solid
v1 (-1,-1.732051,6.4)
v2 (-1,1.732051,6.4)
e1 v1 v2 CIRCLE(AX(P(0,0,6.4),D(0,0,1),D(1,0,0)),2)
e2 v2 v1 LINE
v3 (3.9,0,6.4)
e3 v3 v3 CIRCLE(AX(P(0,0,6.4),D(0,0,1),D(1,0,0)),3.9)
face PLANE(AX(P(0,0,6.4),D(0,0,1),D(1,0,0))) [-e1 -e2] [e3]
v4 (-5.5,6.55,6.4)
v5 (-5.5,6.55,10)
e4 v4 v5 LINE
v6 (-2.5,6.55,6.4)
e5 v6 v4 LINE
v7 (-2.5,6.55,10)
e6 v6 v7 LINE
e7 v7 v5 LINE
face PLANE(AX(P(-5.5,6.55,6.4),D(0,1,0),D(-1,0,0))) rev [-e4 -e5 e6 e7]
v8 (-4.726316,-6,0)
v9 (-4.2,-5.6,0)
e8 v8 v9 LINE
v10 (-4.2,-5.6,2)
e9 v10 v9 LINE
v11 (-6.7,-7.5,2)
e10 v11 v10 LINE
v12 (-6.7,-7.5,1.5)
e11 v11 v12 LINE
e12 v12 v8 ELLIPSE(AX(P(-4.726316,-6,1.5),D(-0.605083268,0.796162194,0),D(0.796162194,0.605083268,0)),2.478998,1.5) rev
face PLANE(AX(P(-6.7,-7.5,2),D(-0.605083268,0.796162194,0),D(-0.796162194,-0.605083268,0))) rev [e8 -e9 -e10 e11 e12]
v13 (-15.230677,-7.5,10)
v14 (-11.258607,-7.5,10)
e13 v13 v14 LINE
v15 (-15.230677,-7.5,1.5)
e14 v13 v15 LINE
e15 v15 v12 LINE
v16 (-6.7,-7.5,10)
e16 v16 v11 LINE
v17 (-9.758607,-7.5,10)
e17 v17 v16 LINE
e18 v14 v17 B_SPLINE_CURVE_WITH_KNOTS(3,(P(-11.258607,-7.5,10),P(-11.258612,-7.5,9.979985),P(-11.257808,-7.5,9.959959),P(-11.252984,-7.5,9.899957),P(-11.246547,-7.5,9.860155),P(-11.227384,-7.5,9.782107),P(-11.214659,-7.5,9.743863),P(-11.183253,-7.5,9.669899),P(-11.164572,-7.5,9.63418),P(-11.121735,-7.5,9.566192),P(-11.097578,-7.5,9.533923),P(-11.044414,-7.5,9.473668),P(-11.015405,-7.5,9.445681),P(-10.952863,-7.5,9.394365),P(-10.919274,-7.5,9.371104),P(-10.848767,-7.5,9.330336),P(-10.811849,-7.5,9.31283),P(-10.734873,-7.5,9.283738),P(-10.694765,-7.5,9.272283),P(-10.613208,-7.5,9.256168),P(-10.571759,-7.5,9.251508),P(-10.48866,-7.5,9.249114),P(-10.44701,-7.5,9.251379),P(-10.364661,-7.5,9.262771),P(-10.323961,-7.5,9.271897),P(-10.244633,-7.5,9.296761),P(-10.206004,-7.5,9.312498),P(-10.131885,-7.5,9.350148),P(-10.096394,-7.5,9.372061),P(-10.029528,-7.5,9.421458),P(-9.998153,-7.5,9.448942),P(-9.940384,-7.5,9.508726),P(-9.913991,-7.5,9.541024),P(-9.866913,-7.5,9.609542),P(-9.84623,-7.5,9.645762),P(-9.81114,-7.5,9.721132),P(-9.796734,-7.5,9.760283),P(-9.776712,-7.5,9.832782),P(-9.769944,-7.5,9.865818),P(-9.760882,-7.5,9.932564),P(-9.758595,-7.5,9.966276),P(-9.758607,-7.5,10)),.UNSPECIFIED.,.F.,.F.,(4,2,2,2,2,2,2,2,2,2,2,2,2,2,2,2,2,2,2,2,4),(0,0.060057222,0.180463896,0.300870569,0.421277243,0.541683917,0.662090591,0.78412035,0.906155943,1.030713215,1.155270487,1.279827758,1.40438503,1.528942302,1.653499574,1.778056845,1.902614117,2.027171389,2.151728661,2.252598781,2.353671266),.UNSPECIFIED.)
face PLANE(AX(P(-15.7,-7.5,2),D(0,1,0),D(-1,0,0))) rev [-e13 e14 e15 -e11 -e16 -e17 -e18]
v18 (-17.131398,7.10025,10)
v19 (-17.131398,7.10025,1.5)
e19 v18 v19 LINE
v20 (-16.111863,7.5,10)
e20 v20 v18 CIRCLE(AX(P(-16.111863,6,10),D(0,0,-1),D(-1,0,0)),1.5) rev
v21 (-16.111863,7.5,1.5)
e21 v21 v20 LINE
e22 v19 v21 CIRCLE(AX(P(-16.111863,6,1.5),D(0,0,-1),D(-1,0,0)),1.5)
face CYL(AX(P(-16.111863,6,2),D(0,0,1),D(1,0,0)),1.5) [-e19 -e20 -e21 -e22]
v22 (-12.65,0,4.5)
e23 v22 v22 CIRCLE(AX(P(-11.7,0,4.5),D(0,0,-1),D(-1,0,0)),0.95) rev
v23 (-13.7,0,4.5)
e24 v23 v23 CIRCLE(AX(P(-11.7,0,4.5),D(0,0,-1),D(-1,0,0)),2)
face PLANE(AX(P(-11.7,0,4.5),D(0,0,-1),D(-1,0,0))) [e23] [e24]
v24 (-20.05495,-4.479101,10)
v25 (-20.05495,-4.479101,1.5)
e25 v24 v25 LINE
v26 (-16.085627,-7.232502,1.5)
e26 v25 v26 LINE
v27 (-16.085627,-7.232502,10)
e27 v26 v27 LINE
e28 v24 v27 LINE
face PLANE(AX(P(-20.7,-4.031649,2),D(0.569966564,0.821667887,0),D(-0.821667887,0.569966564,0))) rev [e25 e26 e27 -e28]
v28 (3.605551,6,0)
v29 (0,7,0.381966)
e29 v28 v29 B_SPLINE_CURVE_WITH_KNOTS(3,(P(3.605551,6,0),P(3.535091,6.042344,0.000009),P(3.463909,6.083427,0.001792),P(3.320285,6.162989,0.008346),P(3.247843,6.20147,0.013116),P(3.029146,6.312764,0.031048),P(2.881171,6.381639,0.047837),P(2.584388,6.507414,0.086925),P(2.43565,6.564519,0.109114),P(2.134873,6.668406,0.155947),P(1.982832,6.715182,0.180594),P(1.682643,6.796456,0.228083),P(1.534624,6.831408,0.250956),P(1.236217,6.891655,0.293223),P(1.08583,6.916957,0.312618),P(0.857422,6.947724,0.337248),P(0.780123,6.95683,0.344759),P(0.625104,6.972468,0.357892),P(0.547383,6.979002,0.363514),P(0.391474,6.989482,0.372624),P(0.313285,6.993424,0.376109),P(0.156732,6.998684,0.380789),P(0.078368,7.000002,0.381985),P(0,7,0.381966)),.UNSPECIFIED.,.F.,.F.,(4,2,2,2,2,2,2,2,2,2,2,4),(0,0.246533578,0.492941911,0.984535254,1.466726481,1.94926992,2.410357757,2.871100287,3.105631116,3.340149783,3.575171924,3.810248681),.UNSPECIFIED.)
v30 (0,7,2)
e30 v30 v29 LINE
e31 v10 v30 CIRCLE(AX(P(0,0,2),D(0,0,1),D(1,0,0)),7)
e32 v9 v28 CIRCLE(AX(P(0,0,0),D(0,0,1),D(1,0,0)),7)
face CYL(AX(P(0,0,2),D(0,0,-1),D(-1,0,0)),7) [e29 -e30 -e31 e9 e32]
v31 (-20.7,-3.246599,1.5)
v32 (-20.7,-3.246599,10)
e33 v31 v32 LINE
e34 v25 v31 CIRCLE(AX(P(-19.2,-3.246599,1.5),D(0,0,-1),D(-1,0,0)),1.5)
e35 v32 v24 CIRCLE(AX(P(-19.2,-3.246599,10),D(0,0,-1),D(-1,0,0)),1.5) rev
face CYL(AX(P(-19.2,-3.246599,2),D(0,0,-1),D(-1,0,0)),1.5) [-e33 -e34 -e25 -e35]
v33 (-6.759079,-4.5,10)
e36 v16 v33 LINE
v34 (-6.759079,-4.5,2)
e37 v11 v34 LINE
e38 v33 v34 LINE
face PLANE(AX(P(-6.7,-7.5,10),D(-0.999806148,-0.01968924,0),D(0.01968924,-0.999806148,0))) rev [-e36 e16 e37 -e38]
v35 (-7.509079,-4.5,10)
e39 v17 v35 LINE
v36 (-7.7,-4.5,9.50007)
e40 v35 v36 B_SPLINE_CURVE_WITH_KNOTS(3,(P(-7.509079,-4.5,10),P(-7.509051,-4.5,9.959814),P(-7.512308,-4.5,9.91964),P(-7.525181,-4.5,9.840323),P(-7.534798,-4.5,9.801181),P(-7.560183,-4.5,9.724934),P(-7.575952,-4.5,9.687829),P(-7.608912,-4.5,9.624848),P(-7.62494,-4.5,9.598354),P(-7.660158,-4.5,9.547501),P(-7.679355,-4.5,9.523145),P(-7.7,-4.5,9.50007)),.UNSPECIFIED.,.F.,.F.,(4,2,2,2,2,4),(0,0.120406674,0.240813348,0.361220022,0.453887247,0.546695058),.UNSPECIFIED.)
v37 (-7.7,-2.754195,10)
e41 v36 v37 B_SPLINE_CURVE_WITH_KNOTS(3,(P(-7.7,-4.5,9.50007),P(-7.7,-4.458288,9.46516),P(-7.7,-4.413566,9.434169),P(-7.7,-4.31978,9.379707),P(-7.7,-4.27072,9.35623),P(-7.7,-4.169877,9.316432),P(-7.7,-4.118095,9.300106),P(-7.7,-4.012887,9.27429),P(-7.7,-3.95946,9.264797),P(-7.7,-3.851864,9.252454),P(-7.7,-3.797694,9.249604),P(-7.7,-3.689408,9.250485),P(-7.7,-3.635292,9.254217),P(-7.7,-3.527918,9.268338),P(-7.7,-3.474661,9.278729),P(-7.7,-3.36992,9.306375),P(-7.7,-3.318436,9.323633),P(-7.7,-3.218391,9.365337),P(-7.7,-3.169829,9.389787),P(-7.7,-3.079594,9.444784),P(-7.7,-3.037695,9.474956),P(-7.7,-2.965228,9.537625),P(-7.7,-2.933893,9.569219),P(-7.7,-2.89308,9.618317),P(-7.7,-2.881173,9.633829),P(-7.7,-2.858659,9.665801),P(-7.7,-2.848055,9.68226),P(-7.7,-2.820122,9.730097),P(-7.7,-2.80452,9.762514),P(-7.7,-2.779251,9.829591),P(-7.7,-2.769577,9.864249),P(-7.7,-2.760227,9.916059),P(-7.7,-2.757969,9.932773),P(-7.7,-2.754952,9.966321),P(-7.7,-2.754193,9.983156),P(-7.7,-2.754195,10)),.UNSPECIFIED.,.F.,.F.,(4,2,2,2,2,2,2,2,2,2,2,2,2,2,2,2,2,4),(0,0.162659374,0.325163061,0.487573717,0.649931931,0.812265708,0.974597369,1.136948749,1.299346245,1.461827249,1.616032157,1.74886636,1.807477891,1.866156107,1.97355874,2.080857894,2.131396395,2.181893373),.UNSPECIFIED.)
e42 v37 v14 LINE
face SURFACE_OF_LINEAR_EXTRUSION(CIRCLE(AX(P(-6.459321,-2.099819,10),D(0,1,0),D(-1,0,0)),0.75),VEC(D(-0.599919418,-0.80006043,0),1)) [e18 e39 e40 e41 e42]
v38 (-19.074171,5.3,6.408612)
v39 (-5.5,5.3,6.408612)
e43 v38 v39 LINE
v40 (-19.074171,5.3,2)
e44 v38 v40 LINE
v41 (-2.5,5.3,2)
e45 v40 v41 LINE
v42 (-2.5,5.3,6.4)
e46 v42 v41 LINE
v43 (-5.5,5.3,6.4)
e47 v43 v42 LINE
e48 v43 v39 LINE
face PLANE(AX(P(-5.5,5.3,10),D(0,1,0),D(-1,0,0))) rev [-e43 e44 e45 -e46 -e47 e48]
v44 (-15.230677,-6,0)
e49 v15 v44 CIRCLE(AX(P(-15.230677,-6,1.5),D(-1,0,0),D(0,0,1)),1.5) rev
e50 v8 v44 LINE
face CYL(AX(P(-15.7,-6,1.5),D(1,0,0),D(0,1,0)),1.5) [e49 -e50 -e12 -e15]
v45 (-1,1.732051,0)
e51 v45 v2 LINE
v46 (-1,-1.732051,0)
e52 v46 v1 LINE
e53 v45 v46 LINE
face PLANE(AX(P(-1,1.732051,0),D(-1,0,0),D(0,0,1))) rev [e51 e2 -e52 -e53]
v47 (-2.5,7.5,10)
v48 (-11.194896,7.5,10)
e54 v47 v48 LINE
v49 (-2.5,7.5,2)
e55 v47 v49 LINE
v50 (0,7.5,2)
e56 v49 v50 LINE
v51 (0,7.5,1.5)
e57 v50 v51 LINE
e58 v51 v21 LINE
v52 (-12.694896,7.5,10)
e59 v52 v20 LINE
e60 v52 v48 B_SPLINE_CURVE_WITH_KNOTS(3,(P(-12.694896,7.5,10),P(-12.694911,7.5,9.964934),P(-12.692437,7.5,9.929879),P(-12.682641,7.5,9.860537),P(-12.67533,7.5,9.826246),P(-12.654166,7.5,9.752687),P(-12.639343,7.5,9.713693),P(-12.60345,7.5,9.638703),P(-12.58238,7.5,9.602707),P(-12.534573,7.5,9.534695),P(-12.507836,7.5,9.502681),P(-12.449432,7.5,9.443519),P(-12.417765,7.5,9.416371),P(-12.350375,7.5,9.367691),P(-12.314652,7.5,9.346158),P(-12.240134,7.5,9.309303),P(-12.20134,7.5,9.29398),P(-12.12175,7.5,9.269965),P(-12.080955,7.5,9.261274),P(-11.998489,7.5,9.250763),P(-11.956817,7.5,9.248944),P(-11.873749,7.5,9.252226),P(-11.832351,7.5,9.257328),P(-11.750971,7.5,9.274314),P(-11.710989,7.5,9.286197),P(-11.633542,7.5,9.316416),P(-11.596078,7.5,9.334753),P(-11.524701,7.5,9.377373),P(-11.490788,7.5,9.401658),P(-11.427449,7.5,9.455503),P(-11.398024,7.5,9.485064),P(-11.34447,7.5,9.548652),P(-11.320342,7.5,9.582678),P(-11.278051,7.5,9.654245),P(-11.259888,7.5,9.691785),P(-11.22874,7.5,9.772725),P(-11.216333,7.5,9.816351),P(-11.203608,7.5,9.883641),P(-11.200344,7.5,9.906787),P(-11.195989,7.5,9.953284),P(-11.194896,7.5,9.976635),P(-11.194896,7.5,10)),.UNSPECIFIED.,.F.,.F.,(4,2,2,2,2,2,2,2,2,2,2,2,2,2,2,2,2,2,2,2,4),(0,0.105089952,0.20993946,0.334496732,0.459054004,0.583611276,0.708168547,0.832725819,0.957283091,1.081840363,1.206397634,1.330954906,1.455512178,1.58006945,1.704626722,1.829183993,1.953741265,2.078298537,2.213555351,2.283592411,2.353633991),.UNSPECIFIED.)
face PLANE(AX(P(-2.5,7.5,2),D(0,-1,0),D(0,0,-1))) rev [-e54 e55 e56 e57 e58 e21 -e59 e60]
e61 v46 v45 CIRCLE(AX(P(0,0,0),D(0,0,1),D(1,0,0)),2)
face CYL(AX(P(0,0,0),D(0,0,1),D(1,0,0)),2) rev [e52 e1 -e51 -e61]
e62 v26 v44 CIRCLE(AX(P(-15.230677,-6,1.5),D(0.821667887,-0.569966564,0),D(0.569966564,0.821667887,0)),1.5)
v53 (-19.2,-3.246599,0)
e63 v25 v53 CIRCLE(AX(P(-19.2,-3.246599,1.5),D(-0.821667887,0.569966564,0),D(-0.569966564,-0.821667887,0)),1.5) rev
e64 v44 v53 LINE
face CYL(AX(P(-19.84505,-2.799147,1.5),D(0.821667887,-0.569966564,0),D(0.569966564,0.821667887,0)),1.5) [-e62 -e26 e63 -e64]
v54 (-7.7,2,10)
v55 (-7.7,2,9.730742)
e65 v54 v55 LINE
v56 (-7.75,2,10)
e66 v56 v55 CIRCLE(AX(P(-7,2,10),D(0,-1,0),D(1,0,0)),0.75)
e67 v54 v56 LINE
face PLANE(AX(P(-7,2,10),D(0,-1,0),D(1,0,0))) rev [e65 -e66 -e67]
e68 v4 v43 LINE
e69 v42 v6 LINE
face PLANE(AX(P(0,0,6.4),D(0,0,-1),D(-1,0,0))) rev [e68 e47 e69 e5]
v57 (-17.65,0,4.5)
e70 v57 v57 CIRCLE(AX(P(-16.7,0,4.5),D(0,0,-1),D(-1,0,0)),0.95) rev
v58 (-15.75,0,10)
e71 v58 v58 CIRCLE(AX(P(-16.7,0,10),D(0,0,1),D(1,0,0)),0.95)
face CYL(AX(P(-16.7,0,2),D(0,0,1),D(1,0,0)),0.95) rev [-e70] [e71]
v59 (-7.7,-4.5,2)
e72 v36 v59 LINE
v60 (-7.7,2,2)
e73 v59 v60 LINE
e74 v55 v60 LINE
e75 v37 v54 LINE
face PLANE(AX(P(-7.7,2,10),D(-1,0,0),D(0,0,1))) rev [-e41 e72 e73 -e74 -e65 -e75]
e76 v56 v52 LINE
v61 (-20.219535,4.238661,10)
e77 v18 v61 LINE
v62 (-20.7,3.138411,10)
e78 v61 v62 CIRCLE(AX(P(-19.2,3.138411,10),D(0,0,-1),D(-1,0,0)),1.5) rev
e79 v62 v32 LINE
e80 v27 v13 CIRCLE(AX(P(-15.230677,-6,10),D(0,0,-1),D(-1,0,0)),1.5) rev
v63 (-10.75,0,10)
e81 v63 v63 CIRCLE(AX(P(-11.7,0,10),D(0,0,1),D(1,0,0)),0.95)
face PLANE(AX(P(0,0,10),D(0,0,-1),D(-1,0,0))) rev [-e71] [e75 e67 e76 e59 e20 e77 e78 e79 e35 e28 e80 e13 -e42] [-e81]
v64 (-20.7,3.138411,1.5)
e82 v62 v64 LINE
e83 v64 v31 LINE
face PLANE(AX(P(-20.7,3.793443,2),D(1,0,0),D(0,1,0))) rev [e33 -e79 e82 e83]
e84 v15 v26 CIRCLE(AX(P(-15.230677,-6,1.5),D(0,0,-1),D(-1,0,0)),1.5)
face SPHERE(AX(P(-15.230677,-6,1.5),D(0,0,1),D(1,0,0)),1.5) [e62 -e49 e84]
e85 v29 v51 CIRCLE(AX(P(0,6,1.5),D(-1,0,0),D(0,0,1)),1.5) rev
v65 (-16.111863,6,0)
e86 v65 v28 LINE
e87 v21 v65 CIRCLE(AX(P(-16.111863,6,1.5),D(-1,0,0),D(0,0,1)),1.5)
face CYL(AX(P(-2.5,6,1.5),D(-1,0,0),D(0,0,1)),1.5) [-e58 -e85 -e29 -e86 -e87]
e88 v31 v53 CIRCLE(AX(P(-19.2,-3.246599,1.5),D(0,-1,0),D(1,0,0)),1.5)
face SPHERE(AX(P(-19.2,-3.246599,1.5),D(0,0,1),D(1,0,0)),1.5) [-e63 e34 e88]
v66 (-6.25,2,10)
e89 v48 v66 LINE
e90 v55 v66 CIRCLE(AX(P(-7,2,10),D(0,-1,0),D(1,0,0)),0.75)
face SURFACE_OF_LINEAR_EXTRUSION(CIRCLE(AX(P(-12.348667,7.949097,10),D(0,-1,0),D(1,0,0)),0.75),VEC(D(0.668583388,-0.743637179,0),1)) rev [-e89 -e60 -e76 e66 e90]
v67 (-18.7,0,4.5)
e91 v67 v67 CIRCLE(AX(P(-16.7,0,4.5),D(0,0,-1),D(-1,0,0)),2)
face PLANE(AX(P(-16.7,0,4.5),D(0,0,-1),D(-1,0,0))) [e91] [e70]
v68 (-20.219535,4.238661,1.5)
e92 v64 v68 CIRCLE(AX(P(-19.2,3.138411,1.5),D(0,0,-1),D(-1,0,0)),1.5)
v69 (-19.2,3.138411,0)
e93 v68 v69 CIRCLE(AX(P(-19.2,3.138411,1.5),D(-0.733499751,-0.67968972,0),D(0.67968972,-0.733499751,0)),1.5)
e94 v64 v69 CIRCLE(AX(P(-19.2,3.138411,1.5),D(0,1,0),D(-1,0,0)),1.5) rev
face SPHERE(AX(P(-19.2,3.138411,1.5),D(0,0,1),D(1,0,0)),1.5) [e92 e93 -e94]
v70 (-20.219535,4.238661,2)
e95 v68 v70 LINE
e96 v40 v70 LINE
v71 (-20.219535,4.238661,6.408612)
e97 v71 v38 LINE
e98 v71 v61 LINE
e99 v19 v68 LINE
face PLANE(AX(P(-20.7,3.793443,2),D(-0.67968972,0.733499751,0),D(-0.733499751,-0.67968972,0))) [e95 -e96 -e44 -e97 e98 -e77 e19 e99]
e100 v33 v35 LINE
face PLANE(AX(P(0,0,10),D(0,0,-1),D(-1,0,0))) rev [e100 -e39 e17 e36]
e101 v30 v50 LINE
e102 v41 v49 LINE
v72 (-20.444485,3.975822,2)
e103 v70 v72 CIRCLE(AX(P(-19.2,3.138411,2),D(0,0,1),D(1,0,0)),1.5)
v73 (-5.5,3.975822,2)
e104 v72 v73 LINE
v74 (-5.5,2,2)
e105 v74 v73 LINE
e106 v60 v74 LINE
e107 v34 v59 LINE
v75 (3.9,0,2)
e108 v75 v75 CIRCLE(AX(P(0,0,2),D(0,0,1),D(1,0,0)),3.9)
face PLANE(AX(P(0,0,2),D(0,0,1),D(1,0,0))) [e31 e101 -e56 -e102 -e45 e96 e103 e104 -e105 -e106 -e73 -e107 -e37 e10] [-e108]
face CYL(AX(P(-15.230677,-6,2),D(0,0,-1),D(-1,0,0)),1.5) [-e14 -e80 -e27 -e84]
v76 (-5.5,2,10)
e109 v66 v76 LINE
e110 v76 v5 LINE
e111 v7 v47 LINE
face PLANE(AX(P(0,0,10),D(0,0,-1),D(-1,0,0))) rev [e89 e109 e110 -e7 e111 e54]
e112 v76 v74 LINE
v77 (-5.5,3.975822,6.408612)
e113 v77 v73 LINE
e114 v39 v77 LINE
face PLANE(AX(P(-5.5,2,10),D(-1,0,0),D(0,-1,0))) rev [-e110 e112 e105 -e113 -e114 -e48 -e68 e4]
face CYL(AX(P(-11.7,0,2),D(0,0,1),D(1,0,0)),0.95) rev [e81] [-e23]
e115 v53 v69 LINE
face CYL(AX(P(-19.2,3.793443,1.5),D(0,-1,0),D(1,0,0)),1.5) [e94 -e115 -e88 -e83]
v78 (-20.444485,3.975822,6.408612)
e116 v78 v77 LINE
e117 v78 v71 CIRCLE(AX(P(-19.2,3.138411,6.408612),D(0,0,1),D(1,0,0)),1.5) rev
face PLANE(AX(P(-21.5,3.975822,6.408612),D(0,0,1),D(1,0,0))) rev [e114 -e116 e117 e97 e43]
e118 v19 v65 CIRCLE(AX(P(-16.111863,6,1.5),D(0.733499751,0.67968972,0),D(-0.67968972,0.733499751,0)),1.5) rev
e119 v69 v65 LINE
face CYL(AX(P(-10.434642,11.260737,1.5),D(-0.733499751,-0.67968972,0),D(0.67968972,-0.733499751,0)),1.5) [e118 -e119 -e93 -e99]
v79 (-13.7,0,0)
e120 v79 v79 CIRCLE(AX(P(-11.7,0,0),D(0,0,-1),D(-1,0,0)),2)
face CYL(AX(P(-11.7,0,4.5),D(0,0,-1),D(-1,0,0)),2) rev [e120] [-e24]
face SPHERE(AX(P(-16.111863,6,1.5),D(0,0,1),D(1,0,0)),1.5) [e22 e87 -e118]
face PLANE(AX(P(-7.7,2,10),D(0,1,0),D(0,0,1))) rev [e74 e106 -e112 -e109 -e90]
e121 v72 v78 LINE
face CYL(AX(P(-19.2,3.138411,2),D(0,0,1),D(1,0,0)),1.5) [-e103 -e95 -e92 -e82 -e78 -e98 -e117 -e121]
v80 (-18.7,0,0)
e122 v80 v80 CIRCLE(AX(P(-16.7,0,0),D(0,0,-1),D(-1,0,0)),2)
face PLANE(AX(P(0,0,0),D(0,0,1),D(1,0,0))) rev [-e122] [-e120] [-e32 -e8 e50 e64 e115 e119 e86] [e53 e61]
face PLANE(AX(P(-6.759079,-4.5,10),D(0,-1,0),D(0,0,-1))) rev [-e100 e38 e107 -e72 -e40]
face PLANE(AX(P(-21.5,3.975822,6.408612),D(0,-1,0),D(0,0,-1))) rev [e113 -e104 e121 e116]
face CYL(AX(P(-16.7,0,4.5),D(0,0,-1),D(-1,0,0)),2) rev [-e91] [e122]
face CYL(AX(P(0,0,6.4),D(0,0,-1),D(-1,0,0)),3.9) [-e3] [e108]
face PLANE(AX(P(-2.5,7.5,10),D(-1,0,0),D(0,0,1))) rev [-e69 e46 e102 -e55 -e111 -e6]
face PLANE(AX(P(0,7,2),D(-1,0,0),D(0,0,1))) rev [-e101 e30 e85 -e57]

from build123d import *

# Parameters (mm, degrees)
BOSS_EXTRUDE1_DEPTH      = 2
BOSS_EXTRUDE2_DEPTH      = 8
SKETCH24_R               = 3.9
BOSS_EXTRUDE5_DEPTH      = 4.4
SKETCH30_W               = 4.40861202
SKETCH30_H               = 1.324178481
CUT_EXTRUDE12_DEPTH      = 16
CUT_EXTRUDE11_DEPTH      = 23.928148639
FILLET1_R                = 1.5
SKETCH34_R               = 0.75
CUT_EXTRUDE13_DEPTH      = 8
SKETCH35_R               = 0.75
CUT_EXTRUDE14_DEPTH      = 3
CUT_EXTRUDE14_DEPTH_BACK = 8
SKETCH36_R               = 0.95
CUT_EXTRUDE15_DEPTH      = 8
SKETCH37_R               = 2
CUT_EXTRUDE16_DEPTH      = 4.5
SKETCH38_W               = 3
SKETCH38_H               = 1.25
CUT_EXTRUDE17_DEPTH      = 3.6


with BuildPart() as part:
    # Sketch2 → Boss-Extrude1 (new body)
    with BuildSketch(Plane.XY):
        with BuildLine():
            Line((-2.5, 7.5), (-16.7, 7.5))
            Line((-16.7, 7.5), (-20.7, 3.793442666))
            Line((-20.7, 3.793442666), (-20.7, -4.031648778))
            Line((-20.7, -4.031648778), (-15.7, -7.5))
            Line((-15.7, -7.5), (-6.7, -7.5))
            Line((-6.7, -7.5), (-4.2, -5.6))
            ThreePointArc((-4.2, -5.6), (3.130495168, -6.260990337), (7, 0))
            ThreePointArc((7, 0), (4.949747468, 4.949747468), (0, 7))
            Line((0, 7), (0, 7.5))
            Line((0, 7.5), (-2.5, 7.5))
        make_face()
    extrude(amount=BOSS_EXTRUDE1_DEPTH)

    # Sketch4 → Boss-Extrude2 (add)
    with BuildSketch(Plane.XY.offset(2)):
        Polygon((-15.7, -7.5), (-6.7, -7.5), (-6.759079174, -4.5), (-7.7, -4.5), (-7.7, 2), (-5.5, 2), (-5.5, 5.3), (-2.5, 5.3), (-2.5, 7.5), (-16.7, 7.5), (-20.7, 3.793442666), (-20.7, -4.031648778), align=None)
    extrude(amount=BOSS_EXTRUDE2_DEPTH)

    # Sketch24 → Boss-Extrude5 (add)
    with BuildSketch(Plane.XY.offset(2)):
        Circle(SKETCH24_R)
    extrude(amount=BOSS_EXTRUDE5_DEPTH)

    # Sketch30 → Cut-Extrude12 (cut)
    with BuildSketch(Plane(origin=(-5.5, 0, 0), x_dir=(0, 0, -1), z_dir=(1, 0, 0))):
        with Locations((-4.20430601, 4.63791076)):
            Rectangle(SKETCH30_W, SKETCH30_H)
    extrude(amount=-CUT_EXTRUDE12_DEPTH, mode=Mode.SUBTRACT)

    # Sketch28 → Cut-Extrude11 (cut, through all)
    with BuildSketch(Plane.XY.offset(6.4)):
        with BuildLine():
            Line((-1, 1.732050808), (-1, -1.732050808))
            ThreePointArc((-1, -1.732050808), (2, 0), (-1, 1.732050808))
        make_face()
    extrude(amount=-CUT_EXTRUDE11_DEPTH, mode=Mode.SUBTRACT)

    # Fillet1
    # the kernel refuses this fillet: 1.5 mm, written as the material it takes off along each edge
    with BuildSketch(Plane(origin=(-15.230677435, -6, 1.5), x_dir=(-0.5699665637840448, -0.8216678867816415, 0), z_dir=(0, 0, -1))) as fillet1_piece_1_section:
        Polygon((0, 0), (FILLET1_R * 1.02, 0), (FILLET1_R * 1.02, -FILLET1_R * 0.319139344377), (FILLET1_R * 0.838101244517, -FILLET1_R * 0.58136589506), align=None)
    fillet1_piece_1 = extrude(amount=FILLET1_R * 1.02, mode=Mode.PRIVATE)
    fillet1_piece_1 = fillet1_piece_1 - Plane(origin=(-15.230677435, -6, 1.5), x_dir=(0.29860685961507855, 0.9543762064253388, 0), z_dir=(0, 0, -1)) * Sphere(FILLET1_R, mode=Mode.PRIVATE)
    add(fillet1_piece_1, mode=Mode.SUBTRACT)
    with BuildSketch(Plane(origin=(-16.11186344, 6, 1.5), x_dir=(-0.6796897201843015, 0.7334997506991983, 0), z_dir=(0, 0, -1))) as fillet1_piece_2_section:
        Polygon((0, 0), (FILLET1_R * 1.02, 0), (FILLET1_R * 1.02, FILLET1_R * 0.399932860855), (FILLET1_R * 0.748169745713, FILLET1_R * 0.693283514588), align=None)
    fillet1_piece_2 = extrude(amount=FILLET1_R * 1.02, mode=Mode.PRIVATE)
    fillet1_piece_2 = fillet1_piece_2 - Plane(origin=(-16.11186344, 6, 1.5), x_dir=(0.3650344157067945, -0.9309940254102596, 0), z_dir=(0, 0, -1)) * Sphere(FILLET1_R, mode=Mode.PRIVATE)
    add(fillet1_piece_2, mode=Mode.SUBTRACT)
    with BuildSketch(Plane(origin=(-19.2, 3.138411196, 1.5), x_dir=(-0.6796897201843015, 0.7334997506991983, 0), z_dir=(0, 0, -1))) as fillet1_piece_3_section:
        Polygon((0, 0), (FILLET1_R * 1.02, 0), (FILLET1_R * 1.02, -FILLET1_R * 0.445421399395), (FILLET1_R * 0.693283514588, -FILLET1_R * 0.748169745713), align=None)
    fillet1_piece_3 = extrude(amount=FILLET1_R * 1.02, mode=Mode.PRIVATE)
    fillet1_piece_3 = fillet1_piece_3 - Plane(origin=(-19.2, 3.138411196, 1.5), x_dir=(0.9164304993244992, -0.40019387789901173, 0), z_dir=(0, 0, -1)) * Sphere(FILLET1_R, mode=Mode.PRIVATE)
    add(fillet1_piece_3, mode=Mode.SUBTRACT)
    with BuildSketch(Plane(origin=(-19.2, -3.246599046, 1.5), x_dir=(-0.5699665637840448, -0.8216678867816415, 0), z_dir=(0, 0, -1))) as fillet1_piece_4_section:
        Polygon((0, 0), (FILLET1_R * 1.02, 0), (FILLET1_R * 1.02, FILLET1_R * 0.533833817771), (FILLET1_R * 0.58136589506, FILLET1_R * 0.838101244517), align=None)
    fillet1_piece_4 = extrude(amount=FILLET1_R * 1.02, mode=Mode.PRIVATE)
    fillet1_piece_4 = fillet1_piece_4 - Plane(origin=(-19.2, -3.246599046, 1.5), x_dir=(0.8859928227090906, 0.46369895202380795, 0), z_dir=(0, 0, -1)) * Sphere(FILLET1_R, mode=Mode.PRIVATE)
    add(fillet1_piece_4, mode=Mode.SUBTRACT)
    with BuildSketch(Plane(origin=(-15.230677435, -7.5, 0), x_dir=(0, 1, 0), z_dir=(1, 0, 0))) as fillet1_piece_5_section:
        with BuildLine():
            CenterArc((FILLET1_R, FILLET1_R), FILLET1_R, 180, 90)
            Line((0, FILLET1_R), (0, 0))
            Line((0, 0), (FILLET1_R, 0))
        make_face()
    fillet1_piece_5 = extrude(amount=12.280677435, mode=Mode.PRIVATE)
    fillet1_piece_5 = split(fillet1_piece_5, bisect_by=Plane(origin=(-9.092127217, -9.318016685, 0.3282266), z_dir=(-0.6050832675335577, 0.7961621941231027, 0)), keep=Keep.TOP, mode=Mode.PRIVATE)
    add(fillet1_piece_5, mode=Mode.SUBTRACT)
    with BuildSketch(Plane(origin=(3.75, 7.5, 0), x_dir=(0, 0, 1), z_dir=(-1, 0, 0))) as fillet1_piece_6:
        with BuildLine():
            CenterArc((FILLET1_R, -FILLET1_R), FILLET1_R, 90, 90)
            Line((0, -FILLET1_R), (0, 0))
            Line((0, 0), (FILLET1_R, 0))
        make_face()
    extrude(amount=19.86186344, mode=Mode.SUBTRACT)
    with BuildSketch(Plane(origin=(-17.13139802, 7.100249626, 0), x_dir=(0.6796897201843014, -0.7334997506991981, 0), z_dir=(-0.7334997506991983, -0.6796897201843015, 0))) as fillet1_piece_7:
        with BuildLine():
            CenterArc((FILLET1_R, FILLET1_R), FILLET1_R, 180, 90)
            Line((0, FILLET1_R), (0, 0))
            Line((0, 0), (FILLET1_R, 0))
        make_face()
    extrude(amount=4.21013989, mode=Mode.SUBTRACT)
    with BuildSketch(Plane(origin=(-20.054949846, -4.479100876, 0), x_dir=(0.5699665637840448, 0.8216678867816416, 0), z_dir=(0.8216678867816415, -0.5699665637840448, 0))) as fillet1_piece_8:
        with BuildLine():
            CenterArc((FILLET1_R, FILLET1_R), FILLET1_R, 180, 90)
            Line((0, FILLET1_R), (0, 0))
            Line((0, 0), (FILLET1_R, 0))
        make_face()
    extrude(amount=4.830811364, mode=Mode.SUBTRACT)
    with BuildSketch(Plane(origin=(-20.7, 3.138411196, 0), x_dir=(1, 0, 0), z_dir=(0, -1, 0))) as fillet1_piece_9:
        with BuildLine():
            CenterArc((FILLET1_R, FILLET1_R), FILLET1_R, 180, 90)
            Line((0, FILLET1_R), (0, 0))
            Line((0, 0), (FILLET1_R, 0))
        make_face()
    extrude(amount=6.385010242, mode=Mode.SUBTRACT)
    with BuildSketch(Plane(origin=(-15.7, -7.5, 1.5), x_dir=(1, 0, 0), z_dir=(0, 0, 1))) as fillet1_piece_10:
        with BuildLine():
            CenterArc((FILLET1_R * 0.312881710173, FILLET1_R), FILLET1_R, 235.252105822, 34.747894178)
            Line((-FILLET1_R * 0.257084853611, FILLET1_R * 0.178332113218), (0, 0))
            Line((0, 0), (FILLET1_R * 0.312881710173, 0))
        make_face()
    extrude(amount=9.673306413, mode=Mode.SUBTRACT)
    with BuildSketch(Plane(origin=(-20.7, -4.031648778, 1.5), x_dir=(0, 1, 0), z_dir=(0, 0, 1))) as fillet1_piece_11:
        with BuildLine():
            CenterArc((FILLET1_R * 0.523366488011, -FILLET1_R), FILLET1_R, 90, 55.252105822)
            Line((-FILLET1_R * 0.298301398771, -FILLET1_R * 0.430033436216), (0, 0))
            Line((0, 0), (FILLET1_R * 0.523366488011, 0))
        make_face()
    extrude(amount=10.46262433, mode=Mode.SUBTRACT)
    with BuildSketch(Plane(origin=(-20.7, 3.793442666, 1.5), x_dir=(0.7334997506991984, 0.6796897201843014, 0), z_dir=(0, 0, 1))) as fillet1_piece_12:
        with BuildLine():
            CenterArc((FILLET1_R * 0.436687646465, -FILLET1_R), FILLET1_R, 90, 47.18059856)
            Line((-FILLET1_R * 0.296812104234, -FILLET1_R * 0.320310279816), (0, 0))
            Line((0, 0), (FILLET1_R * 0.436687646465, 0))
        make_face()
    extrude(amount=10.137578674, mode=Mode.SUBTRACT)
    with BuildSketch(Plane(origin=(-16.7, 7.5, 1.5), x_dir=(1, 0, 0), z_dir=(0, 0, 1))) as fillet1_piece_13:
        with BuildLine():
            CenterArc((FILLET1_R * 0.392091040054, -FILLET1_R), FILLET1_R, 90, 42.81940144)
            Line((-FILLET1_R * 0.287598680131, -FILLET1_R * 0.266500249301), (0, 0))
            Line((0, 0), (FILLET1_R * 0.392091040054, 0))
        make_face()
    extrude(amount=9.9703414, mode=Mode.SUBTRACT)

    # Sketch34 → Cut-Extrude13 (cut, along a direction that is not the sketch's normal)
    with BuildSketch(Plane.XZ.offset(-2)):
        with Locations((-7, 10)):
            Circle(SKETCH34_R)
    extrude(amount=-CUT_EXTRUDE13_DEPTH, dir=(0.6685833876565112, -0.7436371788377336, 0), mode=Mode.SUBTRACT)

    # Sketch35 → Cut-Extrude14 (cut, two sides, along a direction that is not the sketch's normal)
    with BuildSketch(Plane(origin=(0, -4.5, 0), x_dir=(1, 0, 0), z_dir=(0, 1, 0))) as cut_extrude14_sk:
        with Locations((-8.259079174, -10)):
            Circle(SKETCH35_R)
    extrude(amount=CUT_EXTRUDE14_DEPTH, dir=(0.5999194182208608, 0.8000604299935998, 0), mode=Mode.SUBTRACT)
    extrude(cut_extrude14_sk.sketch, amount=-CUT_EXTRUDE14_DEPTH_BACK, dir=(0.5999194182208608, 0.8000604299935998, 0), mode=Mode.SUBTRACT)

    # Sketch36 → Cut-Extrude15 (cut)
    with BuildSketch(Plane.XY.offset(10)):
        with Locations((-11.7, 0)):
            Circle(SKETCH36_R)
        with Locations((-16.7, 0)):
            Circle(SKETCH36_R)
    extrude(amount=-CUT_EXTRUDE15_DEPTH, mode=Mode.SUBTRACT)

    # Sketch37 → Cut-Extrude16 (cut)
    with BuildSketch(Plane(origin=(0, 0, 0), x_dir=(-1, 0, 0), z_dir=(0, 0, -1))):
        with Locations((11.7, 0)):
            Circle(SKETCH37_R)
        with Locations((16.7, 0)):
            Circle(SKETCH37_R)
    extrude(amount=-CUT_EXTRUDE16_DEPTH, mode=Mode.SUBTRACT)

    # Sketch38 → Cut-Extrude17 (cut)
    with BuildSketch(Plane.XY.offset(10)):
        with Locations((-4, 5.925)):
            Rectangle(SKETCH38_W, SKETCH38_H)
    extrude(amount=-CUT_EXTRUDE17_DEPTH, mode=Mode.SUBTRACT)


solid = part.part
